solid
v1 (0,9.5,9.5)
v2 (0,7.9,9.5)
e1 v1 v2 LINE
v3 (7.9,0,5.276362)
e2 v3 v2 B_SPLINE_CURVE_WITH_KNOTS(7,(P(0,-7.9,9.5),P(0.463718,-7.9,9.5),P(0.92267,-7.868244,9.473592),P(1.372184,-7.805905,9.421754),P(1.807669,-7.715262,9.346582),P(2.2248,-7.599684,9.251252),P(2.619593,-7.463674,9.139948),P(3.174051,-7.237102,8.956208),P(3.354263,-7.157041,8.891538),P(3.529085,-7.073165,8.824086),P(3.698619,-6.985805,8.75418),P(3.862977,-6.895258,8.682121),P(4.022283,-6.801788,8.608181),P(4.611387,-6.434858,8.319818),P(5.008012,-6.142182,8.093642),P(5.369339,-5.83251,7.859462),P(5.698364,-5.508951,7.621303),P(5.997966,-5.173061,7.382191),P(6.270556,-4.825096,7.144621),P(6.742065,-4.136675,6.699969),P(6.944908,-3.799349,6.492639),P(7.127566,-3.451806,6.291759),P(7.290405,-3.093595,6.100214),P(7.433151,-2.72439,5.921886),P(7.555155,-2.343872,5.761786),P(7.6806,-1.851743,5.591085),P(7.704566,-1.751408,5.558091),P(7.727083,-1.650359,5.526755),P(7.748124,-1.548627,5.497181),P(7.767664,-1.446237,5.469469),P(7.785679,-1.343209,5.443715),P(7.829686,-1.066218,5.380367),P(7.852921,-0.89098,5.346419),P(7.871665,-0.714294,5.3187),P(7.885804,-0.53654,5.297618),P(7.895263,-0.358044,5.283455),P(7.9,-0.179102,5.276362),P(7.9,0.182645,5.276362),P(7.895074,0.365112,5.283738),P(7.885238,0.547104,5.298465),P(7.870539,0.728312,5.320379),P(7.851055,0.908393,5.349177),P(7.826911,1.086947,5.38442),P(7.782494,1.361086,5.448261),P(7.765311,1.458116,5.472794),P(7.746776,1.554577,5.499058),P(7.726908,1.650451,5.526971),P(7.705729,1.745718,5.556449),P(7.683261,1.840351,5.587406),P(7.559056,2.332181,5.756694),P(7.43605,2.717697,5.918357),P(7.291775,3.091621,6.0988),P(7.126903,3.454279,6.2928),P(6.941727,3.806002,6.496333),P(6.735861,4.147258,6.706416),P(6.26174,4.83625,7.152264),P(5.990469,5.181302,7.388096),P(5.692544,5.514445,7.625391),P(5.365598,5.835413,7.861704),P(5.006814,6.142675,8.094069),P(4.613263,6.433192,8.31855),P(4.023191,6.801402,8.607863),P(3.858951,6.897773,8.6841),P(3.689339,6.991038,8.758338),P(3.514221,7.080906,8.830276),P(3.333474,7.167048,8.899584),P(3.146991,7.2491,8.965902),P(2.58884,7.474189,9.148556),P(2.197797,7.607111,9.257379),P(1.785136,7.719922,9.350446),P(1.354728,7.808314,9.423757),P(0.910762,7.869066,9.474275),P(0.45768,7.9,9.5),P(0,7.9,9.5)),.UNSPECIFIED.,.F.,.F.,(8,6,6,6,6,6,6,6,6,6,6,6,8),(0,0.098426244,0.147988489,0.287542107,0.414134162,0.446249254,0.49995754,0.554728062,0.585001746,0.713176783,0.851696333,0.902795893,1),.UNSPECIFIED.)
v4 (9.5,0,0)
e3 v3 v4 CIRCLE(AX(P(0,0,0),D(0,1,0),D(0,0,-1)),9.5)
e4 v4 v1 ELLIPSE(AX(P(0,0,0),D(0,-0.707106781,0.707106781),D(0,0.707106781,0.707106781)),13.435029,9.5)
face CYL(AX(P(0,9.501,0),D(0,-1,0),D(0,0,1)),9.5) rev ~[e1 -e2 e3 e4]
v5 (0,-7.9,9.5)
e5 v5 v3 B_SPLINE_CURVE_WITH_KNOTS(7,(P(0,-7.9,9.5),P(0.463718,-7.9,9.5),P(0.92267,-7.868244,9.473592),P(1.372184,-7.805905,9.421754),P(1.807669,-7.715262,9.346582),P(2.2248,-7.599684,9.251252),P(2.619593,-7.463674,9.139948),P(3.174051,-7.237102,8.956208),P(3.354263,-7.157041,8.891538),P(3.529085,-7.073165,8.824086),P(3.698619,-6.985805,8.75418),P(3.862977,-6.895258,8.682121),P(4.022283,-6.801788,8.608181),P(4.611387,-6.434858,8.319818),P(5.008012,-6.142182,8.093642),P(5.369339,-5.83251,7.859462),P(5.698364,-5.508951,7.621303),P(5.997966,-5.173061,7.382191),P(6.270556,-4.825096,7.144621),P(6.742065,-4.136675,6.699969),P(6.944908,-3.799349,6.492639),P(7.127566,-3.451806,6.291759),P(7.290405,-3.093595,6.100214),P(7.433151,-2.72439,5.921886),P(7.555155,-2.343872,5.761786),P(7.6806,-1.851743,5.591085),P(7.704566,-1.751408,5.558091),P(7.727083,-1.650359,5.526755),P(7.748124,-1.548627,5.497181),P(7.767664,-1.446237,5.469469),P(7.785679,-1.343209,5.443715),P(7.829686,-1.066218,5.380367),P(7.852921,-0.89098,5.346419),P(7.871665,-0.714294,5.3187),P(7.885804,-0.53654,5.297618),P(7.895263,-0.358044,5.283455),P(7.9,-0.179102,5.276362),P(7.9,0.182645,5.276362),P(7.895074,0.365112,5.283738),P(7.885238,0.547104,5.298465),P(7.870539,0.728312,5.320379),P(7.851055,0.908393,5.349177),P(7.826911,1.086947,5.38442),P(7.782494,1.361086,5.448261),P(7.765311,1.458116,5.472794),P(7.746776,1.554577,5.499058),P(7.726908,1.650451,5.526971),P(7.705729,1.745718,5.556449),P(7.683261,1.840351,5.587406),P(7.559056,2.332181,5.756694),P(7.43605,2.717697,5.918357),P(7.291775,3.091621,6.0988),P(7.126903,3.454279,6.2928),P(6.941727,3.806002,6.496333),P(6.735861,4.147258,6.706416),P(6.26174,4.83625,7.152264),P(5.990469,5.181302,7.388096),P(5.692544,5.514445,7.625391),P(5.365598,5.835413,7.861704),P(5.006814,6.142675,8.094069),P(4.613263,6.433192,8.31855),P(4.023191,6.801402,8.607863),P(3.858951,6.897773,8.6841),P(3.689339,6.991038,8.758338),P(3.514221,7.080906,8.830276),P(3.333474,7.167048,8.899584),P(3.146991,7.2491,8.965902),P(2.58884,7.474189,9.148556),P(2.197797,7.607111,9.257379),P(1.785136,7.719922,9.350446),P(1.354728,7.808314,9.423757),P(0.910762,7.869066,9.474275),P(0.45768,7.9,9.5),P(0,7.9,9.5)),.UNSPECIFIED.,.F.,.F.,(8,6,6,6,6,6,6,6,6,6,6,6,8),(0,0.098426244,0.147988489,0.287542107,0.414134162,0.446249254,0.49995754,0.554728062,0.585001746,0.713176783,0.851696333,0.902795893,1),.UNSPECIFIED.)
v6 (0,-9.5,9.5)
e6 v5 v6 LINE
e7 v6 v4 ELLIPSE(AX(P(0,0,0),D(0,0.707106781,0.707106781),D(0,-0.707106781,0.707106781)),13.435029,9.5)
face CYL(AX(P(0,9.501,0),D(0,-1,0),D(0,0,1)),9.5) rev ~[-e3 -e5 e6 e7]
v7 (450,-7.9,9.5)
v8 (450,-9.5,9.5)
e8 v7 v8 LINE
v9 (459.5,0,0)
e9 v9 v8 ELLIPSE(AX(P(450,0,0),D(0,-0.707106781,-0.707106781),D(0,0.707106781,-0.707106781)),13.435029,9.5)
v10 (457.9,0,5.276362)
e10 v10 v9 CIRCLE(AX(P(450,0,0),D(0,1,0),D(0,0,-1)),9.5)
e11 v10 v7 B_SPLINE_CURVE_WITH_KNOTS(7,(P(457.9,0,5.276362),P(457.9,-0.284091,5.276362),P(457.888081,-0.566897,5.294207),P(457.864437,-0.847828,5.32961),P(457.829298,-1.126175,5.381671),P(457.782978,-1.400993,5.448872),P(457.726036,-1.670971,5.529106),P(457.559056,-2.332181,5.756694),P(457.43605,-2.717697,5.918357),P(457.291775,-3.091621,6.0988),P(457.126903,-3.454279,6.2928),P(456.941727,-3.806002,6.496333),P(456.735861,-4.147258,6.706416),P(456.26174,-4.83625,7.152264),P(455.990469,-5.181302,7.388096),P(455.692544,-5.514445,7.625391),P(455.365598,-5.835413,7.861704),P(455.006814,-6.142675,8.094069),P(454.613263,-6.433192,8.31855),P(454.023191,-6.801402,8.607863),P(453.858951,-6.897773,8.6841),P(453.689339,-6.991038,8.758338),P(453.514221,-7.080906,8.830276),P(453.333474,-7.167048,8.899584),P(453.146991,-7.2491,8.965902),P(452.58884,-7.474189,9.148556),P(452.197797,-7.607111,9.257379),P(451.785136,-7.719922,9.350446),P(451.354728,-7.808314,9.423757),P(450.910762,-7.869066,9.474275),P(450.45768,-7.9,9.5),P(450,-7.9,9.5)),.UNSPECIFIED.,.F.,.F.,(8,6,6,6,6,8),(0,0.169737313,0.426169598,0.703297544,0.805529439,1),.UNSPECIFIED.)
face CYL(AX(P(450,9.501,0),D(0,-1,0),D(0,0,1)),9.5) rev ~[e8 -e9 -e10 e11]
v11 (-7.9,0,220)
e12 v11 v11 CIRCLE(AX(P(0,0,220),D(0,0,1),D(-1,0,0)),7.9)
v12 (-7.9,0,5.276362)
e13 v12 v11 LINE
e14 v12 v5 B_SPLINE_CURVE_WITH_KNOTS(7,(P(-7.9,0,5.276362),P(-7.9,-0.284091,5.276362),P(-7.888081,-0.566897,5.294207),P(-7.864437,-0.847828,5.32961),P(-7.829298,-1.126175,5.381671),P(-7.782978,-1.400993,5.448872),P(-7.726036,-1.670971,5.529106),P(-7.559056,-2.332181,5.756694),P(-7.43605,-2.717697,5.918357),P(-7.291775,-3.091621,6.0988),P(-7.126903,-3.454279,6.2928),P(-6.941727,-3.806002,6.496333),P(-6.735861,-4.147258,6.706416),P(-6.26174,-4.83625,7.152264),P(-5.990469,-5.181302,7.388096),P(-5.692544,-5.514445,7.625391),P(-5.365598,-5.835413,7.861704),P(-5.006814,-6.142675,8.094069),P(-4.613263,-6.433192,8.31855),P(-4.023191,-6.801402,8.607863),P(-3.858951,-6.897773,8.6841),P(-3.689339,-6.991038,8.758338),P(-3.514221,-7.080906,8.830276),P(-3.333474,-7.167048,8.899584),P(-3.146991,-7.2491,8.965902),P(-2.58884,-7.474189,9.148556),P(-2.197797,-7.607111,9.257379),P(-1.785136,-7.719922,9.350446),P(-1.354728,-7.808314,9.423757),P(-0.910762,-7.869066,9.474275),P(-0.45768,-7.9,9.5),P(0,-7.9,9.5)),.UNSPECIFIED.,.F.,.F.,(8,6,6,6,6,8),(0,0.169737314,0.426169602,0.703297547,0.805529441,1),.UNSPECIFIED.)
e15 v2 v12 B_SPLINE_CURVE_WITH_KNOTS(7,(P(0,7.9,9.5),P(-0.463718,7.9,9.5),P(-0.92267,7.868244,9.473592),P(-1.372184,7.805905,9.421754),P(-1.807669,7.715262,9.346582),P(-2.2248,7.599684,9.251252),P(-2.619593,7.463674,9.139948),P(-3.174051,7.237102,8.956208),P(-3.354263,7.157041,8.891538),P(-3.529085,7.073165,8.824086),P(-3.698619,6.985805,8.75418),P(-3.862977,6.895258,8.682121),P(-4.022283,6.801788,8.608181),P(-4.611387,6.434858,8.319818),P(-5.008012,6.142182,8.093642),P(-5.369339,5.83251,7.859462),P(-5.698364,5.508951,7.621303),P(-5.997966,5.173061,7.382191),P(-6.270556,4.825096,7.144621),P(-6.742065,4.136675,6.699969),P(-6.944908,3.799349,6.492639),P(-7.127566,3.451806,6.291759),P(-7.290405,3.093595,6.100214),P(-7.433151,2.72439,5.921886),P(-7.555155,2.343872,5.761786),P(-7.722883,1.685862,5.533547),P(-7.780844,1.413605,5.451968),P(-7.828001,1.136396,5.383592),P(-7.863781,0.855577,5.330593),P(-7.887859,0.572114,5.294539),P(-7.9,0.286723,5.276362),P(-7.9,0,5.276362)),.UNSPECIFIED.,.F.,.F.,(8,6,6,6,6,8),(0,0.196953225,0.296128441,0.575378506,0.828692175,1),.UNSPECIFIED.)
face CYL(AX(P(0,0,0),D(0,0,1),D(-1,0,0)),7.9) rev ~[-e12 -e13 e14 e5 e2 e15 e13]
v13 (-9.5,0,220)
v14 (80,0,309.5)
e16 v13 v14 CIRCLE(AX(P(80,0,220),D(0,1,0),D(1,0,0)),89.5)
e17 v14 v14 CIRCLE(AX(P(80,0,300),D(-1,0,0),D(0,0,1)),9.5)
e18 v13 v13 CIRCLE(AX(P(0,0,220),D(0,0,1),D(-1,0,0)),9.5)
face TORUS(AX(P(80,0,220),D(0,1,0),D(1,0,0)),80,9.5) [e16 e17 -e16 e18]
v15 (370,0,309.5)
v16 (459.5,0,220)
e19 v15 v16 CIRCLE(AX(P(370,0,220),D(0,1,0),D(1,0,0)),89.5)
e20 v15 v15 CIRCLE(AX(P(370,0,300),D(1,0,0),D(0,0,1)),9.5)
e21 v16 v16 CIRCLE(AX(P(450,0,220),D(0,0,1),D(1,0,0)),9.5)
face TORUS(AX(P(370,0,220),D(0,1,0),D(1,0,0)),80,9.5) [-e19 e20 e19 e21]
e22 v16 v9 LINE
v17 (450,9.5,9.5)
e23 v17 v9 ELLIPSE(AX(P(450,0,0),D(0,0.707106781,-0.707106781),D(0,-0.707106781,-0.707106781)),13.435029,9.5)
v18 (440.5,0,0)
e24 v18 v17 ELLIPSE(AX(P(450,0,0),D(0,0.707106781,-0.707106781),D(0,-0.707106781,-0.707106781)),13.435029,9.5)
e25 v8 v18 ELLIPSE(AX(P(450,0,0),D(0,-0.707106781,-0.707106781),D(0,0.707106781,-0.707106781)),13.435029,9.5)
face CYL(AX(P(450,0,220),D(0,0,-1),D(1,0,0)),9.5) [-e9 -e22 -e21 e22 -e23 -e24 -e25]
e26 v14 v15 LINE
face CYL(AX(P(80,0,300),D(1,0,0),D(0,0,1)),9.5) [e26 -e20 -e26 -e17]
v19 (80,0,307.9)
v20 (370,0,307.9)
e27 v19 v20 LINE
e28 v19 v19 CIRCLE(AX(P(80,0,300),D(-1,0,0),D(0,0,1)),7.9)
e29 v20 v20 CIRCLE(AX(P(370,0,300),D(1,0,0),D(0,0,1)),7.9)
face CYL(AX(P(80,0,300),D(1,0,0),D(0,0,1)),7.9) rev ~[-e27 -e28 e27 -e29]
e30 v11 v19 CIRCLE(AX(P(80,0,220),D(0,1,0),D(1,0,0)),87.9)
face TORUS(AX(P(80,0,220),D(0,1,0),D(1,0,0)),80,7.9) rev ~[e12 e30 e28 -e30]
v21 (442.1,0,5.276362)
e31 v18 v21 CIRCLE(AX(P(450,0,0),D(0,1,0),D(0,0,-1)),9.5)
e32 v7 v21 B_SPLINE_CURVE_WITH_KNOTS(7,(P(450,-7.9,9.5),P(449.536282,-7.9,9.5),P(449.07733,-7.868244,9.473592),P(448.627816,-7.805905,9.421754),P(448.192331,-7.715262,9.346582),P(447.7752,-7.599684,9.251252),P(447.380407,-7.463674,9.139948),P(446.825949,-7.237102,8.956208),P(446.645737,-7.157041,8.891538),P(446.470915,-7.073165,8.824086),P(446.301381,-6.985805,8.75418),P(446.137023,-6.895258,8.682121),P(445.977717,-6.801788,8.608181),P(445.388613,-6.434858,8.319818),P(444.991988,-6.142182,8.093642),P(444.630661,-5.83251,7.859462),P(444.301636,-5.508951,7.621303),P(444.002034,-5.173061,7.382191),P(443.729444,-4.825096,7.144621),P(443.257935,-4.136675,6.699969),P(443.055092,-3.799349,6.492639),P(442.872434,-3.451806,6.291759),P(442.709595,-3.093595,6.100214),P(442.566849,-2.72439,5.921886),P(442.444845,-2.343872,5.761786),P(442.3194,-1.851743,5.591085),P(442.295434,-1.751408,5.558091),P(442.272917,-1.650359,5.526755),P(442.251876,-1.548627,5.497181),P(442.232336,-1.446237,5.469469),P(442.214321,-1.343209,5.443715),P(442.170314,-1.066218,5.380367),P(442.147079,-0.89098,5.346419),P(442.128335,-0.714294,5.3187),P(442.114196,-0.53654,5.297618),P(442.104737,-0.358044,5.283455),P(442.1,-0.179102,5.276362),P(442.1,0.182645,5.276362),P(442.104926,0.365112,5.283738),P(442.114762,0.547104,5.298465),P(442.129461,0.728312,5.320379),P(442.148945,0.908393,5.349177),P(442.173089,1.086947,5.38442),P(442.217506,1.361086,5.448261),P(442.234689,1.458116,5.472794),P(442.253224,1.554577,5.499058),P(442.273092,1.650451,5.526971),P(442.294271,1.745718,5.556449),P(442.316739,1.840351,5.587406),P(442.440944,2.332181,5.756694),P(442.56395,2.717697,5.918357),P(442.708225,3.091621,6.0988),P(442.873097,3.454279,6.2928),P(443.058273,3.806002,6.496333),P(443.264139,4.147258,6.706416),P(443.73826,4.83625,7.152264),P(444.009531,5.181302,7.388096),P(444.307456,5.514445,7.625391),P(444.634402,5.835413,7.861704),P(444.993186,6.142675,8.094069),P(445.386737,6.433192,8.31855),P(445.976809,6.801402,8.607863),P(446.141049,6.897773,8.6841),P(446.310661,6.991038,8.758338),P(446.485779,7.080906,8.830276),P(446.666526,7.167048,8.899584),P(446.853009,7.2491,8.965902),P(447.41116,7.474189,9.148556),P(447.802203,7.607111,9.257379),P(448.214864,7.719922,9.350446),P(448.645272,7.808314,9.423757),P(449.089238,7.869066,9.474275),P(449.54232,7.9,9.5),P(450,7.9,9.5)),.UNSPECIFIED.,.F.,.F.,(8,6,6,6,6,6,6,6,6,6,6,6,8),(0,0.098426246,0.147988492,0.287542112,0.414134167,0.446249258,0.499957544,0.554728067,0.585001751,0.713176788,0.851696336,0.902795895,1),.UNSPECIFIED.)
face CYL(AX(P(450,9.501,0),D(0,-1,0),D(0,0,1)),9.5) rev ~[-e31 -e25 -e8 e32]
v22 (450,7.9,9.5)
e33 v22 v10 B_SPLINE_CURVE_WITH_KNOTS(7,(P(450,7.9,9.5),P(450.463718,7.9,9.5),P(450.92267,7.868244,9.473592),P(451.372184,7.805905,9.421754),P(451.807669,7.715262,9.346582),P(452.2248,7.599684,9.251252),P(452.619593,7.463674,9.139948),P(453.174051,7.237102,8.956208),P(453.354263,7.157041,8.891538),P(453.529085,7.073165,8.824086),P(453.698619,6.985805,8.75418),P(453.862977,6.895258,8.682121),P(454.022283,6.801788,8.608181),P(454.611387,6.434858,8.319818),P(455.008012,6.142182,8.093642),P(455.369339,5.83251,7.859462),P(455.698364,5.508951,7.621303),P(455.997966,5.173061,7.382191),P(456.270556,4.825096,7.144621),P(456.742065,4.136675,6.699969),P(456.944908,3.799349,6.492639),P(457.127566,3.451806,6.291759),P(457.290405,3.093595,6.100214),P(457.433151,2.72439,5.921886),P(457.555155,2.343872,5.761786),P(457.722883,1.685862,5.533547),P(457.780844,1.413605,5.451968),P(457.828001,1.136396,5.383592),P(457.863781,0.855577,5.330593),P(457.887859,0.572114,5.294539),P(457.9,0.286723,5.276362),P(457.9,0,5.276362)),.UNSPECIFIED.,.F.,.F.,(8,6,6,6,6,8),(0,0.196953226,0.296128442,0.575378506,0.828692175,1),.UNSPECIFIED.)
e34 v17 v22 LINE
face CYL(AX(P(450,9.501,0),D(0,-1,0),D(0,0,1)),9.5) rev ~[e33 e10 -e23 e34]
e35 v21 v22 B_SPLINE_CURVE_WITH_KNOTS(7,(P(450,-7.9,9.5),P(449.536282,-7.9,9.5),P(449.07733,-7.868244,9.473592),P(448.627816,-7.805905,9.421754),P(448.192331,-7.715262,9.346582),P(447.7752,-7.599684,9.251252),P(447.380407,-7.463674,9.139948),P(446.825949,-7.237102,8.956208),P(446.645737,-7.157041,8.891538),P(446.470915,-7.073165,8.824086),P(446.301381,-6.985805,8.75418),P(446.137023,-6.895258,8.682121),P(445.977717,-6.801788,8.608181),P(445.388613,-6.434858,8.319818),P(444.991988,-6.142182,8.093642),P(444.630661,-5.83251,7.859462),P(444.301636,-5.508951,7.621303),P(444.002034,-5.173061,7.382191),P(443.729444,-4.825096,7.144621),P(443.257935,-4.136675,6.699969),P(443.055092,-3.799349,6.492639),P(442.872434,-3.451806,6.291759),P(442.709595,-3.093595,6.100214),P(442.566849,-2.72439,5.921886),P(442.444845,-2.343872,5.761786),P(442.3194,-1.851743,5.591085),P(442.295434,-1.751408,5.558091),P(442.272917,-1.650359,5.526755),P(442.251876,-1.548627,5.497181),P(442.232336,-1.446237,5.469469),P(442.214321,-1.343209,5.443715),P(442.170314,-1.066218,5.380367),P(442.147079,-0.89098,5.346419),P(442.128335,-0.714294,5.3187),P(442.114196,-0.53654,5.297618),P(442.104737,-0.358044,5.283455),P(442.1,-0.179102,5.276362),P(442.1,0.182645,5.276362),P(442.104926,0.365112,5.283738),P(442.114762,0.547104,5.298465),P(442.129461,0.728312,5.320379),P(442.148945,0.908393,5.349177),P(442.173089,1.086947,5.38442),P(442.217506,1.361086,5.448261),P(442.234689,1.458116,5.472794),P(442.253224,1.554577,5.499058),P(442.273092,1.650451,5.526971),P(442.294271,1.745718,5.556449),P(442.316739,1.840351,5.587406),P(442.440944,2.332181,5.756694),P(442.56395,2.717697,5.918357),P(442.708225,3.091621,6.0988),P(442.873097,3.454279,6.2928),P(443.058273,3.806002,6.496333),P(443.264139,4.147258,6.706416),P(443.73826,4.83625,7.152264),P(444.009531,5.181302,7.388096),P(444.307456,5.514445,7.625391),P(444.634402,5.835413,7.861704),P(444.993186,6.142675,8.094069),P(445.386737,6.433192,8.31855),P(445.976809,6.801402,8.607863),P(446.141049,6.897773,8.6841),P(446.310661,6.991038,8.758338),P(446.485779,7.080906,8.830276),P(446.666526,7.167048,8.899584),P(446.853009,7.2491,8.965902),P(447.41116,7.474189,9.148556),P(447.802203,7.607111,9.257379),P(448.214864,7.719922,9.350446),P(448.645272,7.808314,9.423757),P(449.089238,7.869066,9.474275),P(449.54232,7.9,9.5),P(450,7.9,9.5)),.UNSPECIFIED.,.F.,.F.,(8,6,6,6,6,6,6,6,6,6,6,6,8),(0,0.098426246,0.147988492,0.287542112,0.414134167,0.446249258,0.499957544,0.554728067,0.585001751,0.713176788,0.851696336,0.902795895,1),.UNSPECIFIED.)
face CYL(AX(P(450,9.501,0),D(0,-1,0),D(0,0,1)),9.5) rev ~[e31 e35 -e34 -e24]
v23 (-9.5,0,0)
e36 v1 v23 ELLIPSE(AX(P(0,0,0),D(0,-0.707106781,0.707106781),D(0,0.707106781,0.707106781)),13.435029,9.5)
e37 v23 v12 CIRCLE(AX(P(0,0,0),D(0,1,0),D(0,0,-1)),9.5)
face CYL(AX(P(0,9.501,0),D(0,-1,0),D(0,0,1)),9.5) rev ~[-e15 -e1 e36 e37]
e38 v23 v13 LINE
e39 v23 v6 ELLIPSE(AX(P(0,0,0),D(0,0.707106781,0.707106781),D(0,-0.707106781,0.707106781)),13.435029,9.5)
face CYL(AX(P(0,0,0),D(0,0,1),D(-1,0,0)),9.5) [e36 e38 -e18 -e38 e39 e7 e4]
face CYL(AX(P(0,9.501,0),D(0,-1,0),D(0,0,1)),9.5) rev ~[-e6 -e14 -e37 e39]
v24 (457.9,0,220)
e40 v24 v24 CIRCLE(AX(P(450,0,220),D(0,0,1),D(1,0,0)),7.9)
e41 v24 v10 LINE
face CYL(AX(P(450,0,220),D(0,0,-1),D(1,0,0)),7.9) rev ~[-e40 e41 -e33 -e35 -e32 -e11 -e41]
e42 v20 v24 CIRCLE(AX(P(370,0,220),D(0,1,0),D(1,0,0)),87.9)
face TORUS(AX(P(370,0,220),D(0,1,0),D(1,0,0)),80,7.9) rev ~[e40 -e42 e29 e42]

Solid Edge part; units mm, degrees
sketch "Sketch1" plane through (0, 0, 0) normal (0, -1, 0) x (1, 0, 0)
  line L0 (0, 0) -> (0, 220)
  arc A0 (0, 220) -> (80, 300) centre (80, 220) cw
  line L1 (80, 300) -> (370, 300)
  arc A1 (370, 300) -> (450, 220) centre (370, 220) cw
  line L2 (450, 220) -> (450, 0)
  dimension "D1" = 80
  dimension "D2" = 300
  dimension "D3" = 450
sketch "Sketch2" plane through (0, 0, 0) normal (0, 0, -1) x (-1, 0, 0)
  circle A0 centre (0, 0) radius 9.5
  dimension "D1" = 19
sweep "SweptProtrusion_1" add profiles "Sketch2" path "Sketch1"
shell "Thinwall_1" thickness 1.6 removed faces 4 at (6.5233, -6.1433, 0) at (443.4767, -6.1433, 0) at (6.5233, -6.1433, 0) at (443.4767, -6.1433, 0)
hole "Hole_1" at (0, 0, 0) direction (0, -1, 0) diameter 19 end through all both ways yes
hole "Hole1" at (450, 0, 0) direction (0, -1, 0) diameter 19 end through all both ways yes
properties material "Aluminum, 1060"
